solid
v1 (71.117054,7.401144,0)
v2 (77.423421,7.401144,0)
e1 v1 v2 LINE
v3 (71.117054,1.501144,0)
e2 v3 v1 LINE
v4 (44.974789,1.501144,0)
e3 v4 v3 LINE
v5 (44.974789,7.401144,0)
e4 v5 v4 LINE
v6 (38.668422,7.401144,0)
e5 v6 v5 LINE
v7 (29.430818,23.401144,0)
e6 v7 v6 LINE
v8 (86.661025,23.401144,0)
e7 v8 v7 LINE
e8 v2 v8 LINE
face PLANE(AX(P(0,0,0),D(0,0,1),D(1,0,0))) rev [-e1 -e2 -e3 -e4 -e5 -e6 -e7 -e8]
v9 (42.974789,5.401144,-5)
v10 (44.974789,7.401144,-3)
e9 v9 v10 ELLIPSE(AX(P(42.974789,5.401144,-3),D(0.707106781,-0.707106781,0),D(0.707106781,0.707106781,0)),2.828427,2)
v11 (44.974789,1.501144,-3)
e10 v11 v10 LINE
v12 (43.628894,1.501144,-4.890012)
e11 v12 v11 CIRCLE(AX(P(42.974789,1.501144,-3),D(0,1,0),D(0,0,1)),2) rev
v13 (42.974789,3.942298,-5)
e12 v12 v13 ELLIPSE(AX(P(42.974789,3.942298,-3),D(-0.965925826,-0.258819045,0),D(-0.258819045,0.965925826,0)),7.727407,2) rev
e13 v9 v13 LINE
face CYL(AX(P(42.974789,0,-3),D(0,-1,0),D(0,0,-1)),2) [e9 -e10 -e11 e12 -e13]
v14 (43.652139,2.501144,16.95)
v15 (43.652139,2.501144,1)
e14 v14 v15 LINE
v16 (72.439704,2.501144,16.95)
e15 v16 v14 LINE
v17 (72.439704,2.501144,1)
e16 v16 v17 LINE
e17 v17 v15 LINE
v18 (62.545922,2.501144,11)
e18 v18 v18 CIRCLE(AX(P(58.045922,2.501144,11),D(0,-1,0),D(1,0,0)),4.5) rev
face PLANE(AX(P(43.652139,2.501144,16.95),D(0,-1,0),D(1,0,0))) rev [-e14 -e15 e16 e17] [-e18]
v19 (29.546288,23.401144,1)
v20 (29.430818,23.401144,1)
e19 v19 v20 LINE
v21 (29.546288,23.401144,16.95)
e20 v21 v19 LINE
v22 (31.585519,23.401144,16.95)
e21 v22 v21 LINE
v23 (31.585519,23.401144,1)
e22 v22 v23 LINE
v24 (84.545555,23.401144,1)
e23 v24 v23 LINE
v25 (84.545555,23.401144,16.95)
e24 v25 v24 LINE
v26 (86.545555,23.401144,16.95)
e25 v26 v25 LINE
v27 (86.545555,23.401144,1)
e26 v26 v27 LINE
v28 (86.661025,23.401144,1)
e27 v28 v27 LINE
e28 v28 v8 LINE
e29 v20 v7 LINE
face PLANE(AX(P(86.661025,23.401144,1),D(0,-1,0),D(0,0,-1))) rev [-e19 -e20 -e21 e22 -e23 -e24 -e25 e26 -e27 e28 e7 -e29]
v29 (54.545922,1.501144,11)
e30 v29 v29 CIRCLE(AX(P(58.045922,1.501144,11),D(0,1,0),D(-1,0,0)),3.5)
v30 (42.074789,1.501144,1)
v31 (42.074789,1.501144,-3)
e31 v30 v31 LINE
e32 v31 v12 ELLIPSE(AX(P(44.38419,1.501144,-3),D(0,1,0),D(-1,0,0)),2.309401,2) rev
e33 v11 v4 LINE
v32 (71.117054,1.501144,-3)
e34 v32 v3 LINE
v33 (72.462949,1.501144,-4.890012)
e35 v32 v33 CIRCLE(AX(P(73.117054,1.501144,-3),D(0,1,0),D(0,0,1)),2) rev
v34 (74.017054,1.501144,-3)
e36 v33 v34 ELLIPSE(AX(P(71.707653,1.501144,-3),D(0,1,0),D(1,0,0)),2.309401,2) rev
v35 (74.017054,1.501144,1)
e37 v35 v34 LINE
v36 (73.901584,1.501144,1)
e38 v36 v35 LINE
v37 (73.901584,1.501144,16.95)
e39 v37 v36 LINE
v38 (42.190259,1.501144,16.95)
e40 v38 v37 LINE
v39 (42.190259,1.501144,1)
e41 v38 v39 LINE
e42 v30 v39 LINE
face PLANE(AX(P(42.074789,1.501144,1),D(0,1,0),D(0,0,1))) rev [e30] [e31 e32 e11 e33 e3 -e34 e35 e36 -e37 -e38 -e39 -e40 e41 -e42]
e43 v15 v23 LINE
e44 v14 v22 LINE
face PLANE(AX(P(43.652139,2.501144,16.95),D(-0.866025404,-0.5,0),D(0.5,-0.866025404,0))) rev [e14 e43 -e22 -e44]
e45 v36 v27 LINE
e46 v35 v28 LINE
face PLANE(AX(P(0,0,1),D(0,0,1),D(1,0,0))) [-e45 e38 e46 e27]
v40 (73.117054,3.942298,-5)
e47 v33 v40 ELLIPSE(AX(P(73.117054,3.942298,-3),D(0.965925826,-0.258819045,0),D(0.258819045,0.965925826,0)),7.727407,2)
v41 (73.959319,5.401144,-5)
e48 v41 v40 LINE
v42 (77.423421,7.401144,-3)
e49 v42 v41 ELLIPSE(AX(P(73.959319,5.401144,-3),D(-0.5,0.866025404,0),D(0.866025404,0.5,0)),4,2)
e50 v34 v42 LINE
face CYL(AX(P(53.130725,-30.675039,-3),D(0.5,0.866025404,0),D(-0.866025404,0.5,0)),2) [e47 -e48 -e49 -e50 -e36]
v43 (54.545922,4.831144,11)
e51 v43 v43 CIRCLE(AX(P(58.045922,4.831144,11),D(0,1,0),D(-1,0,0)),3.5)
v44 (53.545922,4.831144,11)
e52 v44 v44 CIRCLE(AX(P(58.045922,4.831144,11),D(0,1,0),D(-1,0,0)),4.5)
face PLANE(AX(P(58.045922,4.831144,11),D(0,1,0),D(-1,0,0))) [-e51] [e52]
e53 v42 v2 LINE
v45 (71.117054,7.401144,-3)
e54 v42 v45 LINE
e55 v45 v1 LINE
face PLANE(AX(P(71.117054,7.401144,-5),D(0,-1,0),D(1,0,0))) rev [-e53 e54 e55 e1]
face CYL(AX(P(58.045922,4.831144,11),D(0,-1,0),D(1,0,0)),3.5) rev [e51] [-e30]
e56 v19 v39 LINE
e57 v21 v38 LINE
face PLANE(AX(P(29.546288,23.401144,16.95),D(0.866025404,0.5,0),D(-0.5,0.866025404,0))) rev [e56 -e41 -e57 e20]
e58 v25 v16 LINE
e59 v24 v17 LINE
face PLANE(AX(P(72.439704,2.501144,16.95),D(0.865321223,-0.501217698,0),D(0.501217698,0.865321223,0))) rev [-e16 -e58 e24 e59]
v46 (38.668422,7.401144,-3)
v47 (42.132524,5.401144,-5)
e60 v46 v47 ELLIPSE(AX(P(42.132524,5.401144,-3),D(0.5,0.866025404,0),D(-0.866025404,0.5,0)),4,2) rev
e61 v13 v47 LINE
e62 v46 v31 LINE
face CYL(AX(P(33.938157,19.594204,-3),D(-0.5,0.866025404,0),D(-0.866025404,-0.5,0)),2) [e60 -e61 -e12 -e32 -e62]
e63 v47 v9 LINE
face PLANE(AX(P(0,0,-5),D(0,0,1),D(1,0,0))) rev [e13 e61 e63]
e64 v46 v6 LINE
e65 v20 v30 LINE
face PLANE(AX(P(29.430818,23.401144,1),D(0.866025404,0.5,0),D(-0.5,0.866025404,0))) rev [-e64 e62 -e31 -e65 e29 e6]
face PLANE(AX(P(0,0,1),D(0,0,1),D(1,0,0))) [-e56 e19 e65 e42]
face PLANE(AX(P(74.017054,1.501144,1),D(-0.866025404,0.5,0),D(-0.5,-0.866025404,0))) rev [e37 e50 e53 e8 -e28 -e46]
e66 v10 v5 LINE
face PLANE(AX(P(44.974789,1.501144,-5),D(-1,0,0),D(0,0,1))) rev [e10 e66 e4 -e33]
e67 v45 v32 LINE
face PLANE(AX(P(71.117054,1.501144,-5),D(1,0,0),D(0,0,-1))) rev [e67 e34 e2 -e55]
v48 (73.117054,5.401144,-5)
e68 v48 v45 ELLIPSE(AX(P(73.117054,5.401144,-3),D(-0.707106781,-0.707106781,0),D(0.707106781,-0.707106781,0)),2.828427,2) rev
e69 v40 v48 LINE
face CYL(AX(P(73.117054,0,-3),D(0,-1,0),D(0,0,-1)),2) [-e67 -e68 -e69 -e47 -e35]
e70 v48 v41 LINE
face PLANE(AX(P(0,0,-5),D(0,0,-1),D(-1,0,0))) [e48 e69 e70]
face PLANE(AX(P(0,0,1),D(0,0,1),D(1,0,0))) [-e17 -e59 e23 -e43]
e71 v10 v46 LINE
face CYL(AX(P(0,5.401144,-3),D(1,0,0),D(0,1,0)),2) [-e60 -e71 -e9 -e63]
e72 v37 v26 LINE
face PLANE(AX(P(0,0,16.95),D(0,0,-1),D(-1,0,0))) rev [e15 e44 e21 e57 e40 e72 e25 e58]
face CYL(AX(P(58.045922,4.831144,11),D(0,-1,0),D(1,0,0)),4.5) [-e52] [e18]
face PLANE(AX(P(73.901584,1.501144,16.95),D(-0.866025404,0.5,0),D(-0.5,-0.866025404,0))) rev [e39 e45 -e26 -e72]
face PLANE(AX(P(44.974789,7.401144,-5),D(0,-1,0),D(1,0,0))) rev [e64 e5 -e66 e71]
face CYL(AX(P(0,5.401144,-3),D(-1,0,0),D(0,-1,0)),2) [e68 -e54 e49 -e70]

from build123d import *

# Parameters (mm, degrees)
BOSS_EXTRUDE1_DEPTH = 1
BOSS_EXTRUDE2_DEPTH = 5
FILLET1_R           = 2
BOSS_EXTRUDE3_DEPTH = 15.95
SKETCH10_R          = 4.5
SKETCH10_R_2        = 3.5
BOSS_EXTRUDE7_DEPTH = 2.33
CUT_EXTRUDE1_START  = -1
SKETCH13_R          = 3.5
CUT_EXTRUDE1_DEPTH  = 1


with BuildPart() as part:
    # Sketch1 → Boss-Extrude1 (new body)
    with BuildSketch(Plane.XY):
        Polygon((86.661024886, 23.401143993), (29.430818123, 23.401143993), (42.074789018, 1.501143993), (74.017053991, 1.501143993), align=None)
    extrude(amount=BOSS_EXTRUDE1_DEPTH)

    # Sketch2 → Boss-Extrude2 (add)
    with BuildSketch(Plane(origin=(0, 0, 0), x_dir=(-1, 0, 0), z_dir=(0, 0, -1))):
        Polygon((-74.017053991, 1.501143993), (-71.117053991, 1.501143993), (-71.117053991, 7.401143993), (-77.423420579, 7.401143993), align=None)
        Polygon((-42.074789018, 1.501143993), (-44.974789018, 1.501143993), (-44.974789018, 7.401143993), (-38.66842243, 7.401143993), align=None)
    extrude(amount=BOSS_EXTRUDE2_DEPTH)

    # Fillet1
    # the kernel refuses this fillet: 2 mm, written as the material it takes off along each edge
    with BuildSketch(Plane(origin=(44.974789018, -3.498856007, -5), x_dir=(-1, 0, 0), z_dir=(0, 1, 0)), Plane(origin=(71.117053991, -3.498856007, -5), x_dir=(0, 0, 1), z_dir=(0, 1, 0))) as fillet1_piece_1:
        with BuildLine():
            CenterArc((FILLET1_R, FILLET1_R), FILLET1_R, 180, 90)
            Line((0, FILLET1_R), (0, 0))
            Line((0, 0), (FILLET1_R, 0))
        make_face()
    extrude(amount=15.9, mode=Mode.SUBTRACT)
    with BuildSketch(Plane(origin=(49.974789018, 7.401143993, -5), x_dir=(0, -1, 0), z_dir=(-1, 0, 0)), Plane(origin=(66.117053991, 7.401143993, -5), x_dir=(0, 0, 1), z_dir=(1, 0, 0))) as fillet1_piece_2:
        with BuildLine():
            CenterArc((FILLET1_R, FILLET1_R), FILLET1_R, 180, 90)
            Line((0, FILLET1_R), (0, 0))
            Line((0, 0), (FILLET1_R, 0))
        make_face()
    extrude(amount=16.306366588, mode=Mode.SUBTRACT)
    with BuildSketch(Plane(origin=(36.16842243, 11.731271012, -5), x_dir=(0.8660254037844386, 0.5000000000000002, 0), z_dir=(0.5000000000000002, -0.8660254037844386, 0))) as fillet1_piece_3:
        with BuildLine():
            CenterArc((FILLET1_R, FILLET1_R), FILLET1_R, 180, 90)
            Line((0, FILLET1_R), (0, 0))
            Line((0, 0), (FILLET1_R, 0))
        make_face()
    extrude(amount=16.812733176, mode=Mode.SUBTRACT)
    with BuildSketch(Plane(origin=(79.923420579, 11.731271012, -5), x_dir=(-0.866025403784438, 0.500000000000001, 0), z_dir=(-0.500000000000001, -0.8660254037844382, 0))) as fillet1_piece_4:
        with BuildLine():
            CenterArc((FILLET1_R, -FILLET1_R), FILLET1_R, 90, 90)
            Line((0, -FILLET1_R), (0, 0))
            Line((0, 0), (FILLET1_R, 0))
        make_face()
    extrude(amount=16.812733176, mode=Mode.SUBTRACT)

    # Sketch4 → Boss-Extrude3 (add)
    with BuildSketch(Plane.XY.offset(1)):
        Polygon((42.190259072, 1.501143993), (73.901583937, 1.501143993), (86.545554832, 23.401143993), (84.545554832, 23.401143993), (72.439703722, 2.501143993), (43.652139287, 2.501143993), (31.585518661, 23.401143993), (29.546288176, 23.401143993), align=None)
    extrude(amount=BOSS_EXTRUDE3_DEPTH)

    # Sketch10 → Boss-Extrude7 (add)
    with BuildSketch(Plane(origin=(0, 2.501143993, 0), x_dir=(1, 0, 0), z_dir=(0, 1, 0))):
        with Locations((58.045921504, -11)):
            Circle(SKETCH10_R)
        with Locations(Location((58.045921504, -11, 0), (0, 0, 180))):
            Circle(SKETCH10_R_2, mode=Mode.SUBTRACT)
    extrude(amount=BOSS_EXTRUDE7_DEPTH)

    # Sketch13 → Cut-Extrude1 (cut)
    with BuildSketch(Plane(origin=(0, 2.501143993, 0), x_dir=(1, 0, 0), z_dir=(0, 1, 0)).offset(CUT_EXTRUDE1_START)):
        with Locations(Location((58.045921504, -11, 0), (0, 0, 180))):
            Circle(SKETCH13_R)
    extrude(amount=CUT_EXTRUDE1_DEPTH, mode=Mode.SUBTRACT)


solid = part.part
